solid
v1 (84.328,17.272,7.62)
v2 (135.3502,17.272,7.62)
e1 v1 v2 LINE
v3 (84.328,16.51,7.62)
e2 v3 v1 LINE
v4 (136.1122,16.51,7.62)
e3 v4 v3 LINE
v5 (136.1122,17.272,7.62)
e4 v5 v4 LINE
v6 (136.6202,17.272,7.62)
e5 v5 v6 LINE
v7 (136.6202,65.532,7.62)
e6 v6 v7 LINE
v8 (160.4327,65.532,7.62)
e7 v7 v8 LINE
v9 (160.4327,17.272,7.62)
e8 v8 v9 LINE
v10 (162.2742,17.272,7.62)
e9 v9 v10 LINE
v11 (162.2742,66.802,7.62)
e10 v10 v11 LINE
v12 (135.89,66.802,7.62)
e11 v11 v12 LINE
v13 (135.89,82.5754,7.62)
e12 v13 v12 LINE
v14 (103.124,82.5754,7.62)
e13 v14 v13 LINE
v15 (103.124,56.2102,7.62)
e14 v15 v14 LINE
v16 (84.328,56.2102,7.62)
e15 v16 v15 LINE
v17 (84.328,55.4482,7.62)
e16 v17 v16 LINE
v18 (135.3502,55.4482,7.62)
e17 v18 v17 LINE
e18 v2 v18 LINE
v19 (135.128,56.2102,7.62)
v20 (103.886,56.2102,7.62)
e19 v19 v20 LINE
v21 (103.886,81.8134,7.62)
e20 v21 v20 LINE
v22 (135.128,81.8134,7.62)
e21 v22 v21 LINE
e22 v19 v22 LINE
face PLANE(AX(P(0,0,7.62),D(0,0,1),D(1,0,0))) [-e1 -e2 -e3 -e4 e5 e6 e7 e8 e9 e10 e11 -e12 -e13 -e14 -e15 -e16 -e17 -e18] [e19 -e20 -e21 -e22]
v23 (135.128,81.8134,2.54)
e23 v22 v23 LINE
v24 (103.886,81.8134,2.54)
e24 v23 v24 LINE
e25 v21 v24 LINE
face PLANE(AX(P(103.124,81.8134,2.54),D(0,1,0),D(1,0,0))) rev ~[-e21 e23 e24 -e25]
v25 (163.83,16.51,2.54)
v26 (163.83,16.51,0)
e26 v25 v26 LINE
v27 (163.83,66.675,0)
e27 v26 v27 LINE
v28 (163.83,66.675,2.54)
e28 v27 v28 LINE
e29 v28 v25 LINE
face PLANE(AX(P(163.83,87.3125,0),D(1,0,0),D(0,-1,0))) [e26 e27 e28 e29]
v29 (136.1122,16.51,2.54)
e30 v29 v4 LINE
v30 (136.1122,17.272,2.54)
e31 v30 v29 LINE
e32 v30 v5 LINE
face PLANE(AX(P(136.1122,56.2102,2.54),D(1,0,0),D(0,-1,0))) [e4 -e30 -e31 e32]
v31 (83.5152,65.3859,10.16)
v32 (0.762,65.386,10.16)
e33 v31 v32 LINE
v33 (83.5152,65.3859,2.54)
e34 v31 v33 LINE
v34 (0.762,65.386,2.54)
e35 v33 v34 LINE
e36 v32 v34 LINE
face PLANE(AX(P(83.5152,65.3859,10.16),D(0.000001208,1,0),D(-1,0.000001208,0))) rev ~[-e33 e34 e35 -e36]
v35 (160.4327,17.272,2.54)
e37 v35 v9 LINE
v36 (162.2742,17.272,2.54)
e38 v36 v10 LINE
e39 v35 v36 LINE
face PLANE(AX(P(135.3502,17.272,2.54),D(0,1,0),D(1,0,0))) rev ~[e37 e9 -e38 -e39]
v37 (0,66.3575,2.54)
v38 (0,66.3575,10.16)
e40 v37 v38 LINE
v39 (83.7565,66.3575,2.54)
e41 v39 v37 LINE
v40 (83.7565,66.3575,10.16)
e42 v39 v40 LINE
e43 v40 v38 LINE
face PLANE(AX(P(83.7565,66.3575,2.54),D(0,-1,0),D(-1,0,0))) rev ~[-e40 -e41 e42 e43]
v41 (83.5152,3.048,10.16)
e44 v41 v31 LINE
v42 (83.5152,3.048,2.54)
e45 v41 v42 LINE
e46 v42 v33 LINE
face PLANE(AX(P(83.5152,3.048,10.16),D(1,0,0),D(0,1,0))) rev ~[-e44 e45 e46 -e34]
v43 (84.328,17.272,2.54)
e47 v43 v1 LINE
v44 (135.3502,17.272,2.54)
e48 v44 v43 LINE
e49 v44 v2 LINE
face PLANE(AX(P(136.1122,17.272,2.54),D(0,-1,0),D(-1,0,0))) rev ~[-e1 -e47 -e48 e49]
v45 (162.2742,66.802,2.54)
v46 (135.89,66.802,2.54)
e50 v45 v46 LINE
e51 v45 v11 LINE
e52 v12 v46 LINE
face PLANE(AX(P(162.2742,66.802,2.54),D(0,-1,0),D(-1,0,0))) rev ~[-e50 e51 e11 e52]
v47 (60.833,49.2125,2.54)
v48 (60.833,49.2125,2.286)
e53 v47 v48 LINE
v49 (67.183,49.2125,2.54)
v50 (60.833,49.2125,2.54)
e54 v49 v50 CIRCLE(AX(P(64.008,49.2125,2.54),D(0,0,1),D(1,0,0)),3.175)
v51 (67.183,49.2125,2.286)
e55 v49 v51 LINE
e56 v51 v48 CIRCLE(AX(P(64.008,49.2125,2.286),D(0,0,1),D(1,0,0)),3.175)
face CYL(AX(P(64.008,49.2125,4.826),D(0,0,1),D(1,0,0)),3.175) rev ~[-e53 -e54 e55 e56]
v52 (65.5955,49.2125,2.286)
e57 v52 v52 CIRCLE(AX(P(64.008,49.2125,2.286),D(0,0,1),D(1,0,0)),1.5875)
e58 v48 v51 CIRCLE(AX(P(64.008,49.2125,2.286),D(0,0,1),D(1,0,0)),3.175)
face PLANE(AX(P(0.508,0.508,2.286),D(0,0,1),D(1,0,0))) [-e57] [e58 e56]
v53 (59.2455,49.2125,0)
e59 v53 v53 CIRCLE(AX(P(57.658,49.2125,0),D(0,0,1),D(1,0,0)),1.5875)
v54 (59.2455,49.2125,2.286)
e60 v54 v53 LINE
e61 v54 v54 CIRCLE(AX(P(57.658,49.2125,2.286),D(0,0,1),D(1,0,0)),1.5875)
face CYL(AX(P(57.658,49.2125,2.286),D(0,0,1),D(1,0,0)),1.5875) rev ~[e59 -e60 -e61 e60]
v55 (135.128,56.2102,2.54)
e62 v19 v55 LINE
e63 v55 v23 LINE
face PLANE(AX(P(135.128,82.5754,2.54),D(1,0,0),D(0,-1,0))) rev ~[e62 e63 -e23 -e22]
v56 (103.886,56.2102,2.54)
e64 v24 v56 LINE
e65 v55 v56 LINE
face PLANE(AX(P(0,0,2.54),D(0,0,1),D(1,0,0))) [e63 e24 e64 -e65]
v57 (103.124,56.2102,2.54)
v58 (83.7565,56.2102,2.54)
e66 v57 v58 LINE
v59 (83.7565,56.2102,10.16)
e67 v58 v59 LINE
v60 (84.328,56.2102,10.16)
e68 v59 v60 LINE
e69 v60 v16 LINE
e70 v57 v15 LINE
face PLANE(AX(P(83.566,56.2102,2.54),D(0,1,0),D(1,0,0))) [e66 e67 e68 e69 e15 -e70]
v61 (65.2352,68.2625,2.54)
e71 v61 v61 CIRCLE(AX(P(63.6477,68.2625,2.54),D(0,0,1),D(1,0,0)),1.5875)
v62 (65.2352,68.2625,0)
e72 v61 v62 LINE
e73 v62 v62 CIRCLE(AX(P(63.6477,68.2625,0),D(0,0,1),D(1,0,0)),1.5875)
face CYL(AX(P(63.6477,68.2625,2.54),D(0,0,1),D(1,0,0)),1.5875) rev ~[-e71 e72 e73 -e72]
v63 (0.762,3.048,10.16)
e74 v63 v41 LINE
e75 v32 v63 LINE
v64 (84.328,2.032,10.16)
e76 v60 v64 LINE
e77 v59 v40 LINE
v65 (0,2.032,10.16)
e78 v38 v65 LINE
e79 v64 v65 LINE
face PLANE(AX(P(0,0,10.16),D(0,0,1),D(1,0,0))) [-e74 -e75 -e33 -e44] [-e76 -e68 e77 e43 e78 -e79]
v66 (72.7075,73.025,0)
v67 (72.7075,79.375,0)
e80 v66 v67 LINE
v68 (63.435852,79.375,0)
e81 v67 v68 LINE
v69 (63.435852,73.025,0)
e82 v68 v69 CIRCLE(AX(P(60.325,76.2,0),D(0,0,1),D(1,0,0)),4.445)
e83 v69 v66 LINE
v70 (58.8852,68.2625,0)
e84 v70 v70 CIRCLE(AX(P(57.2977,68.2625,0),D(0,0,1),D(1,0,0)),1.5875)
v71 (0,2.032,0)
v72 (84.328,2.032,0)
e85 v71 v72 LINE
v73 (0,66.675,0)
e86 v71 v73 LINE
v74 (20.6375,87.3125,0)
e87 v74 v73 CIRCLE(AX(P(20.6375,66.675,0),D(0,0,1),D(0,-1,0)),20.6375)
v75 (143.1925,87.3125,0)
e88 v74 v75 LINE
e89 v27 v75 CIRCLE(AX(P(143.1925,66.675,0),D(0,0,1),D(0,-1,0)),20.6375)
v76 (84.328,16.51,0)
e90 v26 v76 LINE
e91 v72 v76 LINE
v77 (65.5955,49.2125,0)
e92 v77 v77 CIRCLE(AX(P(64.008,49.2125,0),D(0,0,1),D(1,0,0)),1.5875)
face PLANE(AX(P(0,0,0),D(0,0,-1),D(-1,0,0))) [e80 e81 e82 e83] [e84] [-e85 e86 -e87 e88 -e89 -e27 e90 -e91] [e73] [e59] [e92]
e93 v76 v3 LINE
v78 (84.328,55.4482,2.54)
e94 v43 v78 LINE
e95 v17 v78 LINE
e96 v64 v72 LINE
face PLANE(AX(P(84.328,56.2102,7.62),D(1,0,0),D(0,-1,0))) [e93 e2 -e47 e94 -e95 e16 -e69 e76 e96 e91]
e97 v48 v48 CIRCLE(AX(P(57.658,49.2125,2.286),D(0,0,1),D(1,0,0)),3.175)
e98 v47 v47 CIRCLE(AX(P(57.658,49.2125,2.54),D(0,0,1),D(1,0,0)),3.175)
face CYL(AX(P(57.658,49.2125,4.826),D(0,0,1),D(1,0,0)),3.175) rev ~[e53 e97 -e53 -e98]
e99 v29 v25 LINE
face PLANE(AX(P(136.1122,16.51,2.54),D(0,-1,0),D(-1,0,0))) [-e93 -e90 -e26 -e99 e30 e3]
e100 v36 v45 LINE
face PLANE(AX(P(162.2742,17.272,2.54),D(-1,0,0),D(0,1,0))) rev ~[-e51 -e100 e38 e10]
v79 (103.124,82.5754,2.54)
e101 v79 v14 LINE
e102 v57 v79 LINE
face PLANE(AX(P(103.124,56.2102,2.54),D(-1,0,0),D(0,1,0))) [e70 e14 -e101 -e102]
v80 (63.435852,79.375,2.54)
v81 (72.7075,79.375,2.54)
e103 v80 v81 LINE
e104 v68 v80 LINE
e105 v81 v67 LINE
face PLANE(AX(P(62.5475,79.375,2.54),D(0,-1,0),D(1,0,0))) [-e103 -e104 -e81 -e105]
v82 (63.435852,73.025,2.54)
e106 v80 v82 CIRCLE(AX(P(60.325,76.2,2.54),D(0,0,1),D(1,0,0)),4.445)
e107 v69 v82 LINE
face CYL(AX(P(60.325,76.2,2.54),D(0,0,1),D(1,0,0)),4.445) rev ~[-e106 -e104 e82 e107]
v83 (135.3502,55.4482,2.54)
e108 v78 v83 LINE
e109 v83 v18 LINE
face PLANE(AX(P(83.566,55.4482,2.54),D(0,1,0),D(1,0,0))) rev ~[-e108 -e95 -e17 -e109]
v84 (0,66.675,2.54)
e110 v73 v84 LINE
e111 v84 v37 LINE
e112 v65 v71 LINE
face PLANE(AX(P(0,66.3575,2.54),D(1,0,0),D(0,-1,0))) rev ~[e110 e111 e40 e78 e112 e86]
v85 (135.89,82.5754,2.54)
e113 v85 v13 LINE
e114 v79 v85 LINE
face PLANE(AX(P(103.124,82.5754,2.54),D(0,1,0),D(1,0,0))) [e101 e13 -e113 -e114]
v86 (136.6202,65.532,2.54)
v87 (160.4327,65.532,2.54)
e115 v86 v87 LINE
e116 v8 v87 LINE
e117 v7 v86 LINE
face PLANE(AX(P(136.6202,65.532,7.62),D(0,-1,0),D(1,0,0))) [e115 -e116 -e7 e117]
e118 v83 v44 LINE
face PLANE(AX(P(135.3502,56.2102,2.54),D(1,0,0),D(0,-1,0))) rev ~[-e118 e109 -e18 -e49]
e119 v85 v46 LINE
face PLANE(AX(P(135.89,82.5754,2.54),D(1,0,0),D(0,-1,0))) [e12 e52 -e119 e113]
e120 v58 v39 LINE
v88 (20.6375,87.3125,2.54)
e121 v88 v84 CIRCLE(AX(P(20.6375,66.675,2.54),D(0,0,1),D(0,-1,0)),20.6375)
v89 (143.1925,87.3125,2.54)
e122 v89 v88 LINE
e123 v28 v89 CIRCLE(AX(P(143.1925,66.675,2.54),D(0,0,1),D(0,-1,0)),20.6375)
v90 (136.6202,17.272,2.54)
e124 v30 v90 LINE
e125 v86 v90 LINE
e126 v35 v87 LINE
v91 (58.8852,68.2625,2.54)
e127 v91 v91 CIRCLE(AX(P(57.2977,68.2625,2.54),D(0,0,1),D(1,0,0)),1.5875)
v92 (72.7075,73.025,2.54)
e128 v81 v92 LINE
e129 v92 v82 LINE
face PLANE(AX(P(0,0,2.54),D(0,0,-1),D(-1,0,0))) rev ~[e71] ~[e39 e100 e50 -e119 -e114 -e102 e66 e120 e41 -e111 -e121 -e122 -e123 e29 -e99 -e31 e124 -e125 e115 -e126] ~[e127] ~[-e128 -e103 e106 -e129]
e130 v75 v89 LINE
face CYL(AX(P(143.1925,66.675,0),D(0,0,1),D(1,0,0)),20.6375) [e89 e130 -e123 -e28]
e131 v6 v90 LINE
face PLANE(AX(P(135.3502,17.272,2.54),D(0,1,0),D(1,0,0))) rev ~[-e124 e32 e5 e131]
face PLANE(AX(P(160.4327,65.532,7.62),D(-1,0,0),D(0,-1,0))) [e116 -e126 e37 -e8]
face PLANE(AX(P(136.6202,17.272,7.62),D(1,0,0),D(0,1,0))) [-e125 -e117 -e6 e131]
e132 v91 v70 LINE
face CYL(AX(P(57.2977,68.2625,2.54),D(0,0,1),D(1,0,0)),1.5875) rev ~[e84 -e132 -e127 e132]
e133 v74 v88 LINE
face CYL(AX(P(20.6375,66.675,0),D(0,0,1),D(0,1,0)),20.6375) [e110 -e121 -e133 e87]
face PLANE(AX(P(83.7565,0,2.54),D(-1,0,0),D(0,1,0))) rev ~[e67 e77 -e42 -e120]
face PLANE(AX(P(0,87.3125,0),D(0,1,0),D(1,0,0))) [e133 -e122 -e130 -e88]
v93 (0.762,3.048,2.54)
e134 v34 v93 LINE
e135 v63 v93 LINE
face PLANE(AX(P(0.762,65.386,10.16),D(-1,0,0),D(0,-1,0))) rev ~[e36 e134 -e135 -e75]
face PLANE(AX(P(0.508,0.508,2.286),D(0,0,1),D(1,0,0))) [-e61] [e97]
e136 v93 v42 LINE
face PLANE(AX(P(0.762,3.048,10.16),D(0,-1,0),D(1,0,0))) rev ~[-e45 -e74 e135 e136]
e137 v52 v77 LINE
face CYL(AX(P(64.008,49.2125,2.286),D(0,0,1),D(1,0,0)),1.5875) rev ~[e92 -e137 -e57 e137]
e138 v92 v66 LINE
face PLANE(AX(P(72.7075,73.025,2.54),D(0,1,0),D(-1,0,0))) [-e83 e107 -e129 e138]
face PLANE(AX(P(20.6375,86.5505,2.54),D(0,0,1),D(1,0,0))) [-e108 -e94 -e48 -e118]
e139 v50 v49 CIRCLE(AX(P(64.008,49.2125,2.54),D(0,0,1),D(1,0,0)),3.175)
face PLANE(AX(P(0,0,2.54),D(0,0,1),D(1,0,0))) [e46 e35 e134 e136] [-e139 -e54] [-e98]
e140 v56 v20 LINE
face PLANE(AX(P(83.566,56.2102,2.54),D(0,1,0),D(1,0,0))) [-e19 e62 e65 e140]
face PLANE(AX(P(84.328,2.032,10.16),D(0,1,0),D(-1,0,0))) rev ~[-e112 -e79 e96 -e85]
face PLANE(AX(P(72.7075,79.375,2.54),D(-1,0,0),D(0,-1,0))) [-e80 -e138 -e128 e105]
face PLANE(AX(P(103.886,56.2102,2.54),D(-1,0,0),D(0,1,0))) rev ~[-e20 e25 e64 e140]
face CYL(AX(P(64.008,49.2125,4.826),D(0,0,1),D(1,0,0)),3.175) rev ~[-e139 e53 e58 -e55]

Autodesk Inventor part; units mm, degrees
sketch "Sketch1" plane through (0, 0, 0) normal (0, 0, 1) x (1, 0, 0)
  line L0 (0, 87.3125) -> (163.83, 87.3125)
  line L1 (163.83, 87.3125) -> (163.83, 0)
  line L2 (163.83, 0) -> (0, 0)
  line L3 (0, 0) -> (0, 87.3125)
  dimension "d0" = 163.83
  dimension "d1" = 87.3125
extrude "Extrusion1" add sketch "Sketch1" along normal blind 2.54
sketch "Sketch2" plane through (0, 0, 2.54) normal (0, 0, 1) x (1, 0, 0)
  point P0 (0, 0)
fillet "Fillet1" radius 20.6375 1 edges at (163.83, 87.3125, 1.27)
fillet "Fillet2" radius 20.6375 1 edges at (0, 87.3125, 1.27)
sketch "Sketch8" plane through (0, 0, 2.54) normal (0, 0, 1) x (1, 0, 0)
  point P0 (0, 0)
sketch "Sketch11" plane through (0, 0, 2.54) normal (0, 0, 1) x (1, 0, 0)
  point P0 (0, 0)
sketch "Sketch15" plane through (0, 0, 2.54) normal (0, 0, 1) x (1, 0, 0)
  line L0 (83.566, 56.2102) -> (136.1122, 56.2102)
  line L1 (136.1122, 56.2102) -> (136.1122, 16.51)
  line L2 (136.1122, 16.51) -> (83.566, 16.51)
  line L3 (83.566, 16.51) -> (83.566, 56.2102)
  line L4 (0, 0) -> (163.83, 0) projected
  line L5 (163.83, 0) -> (163.83, 66.675) projected
  dimension "d136" = 52.5463
  dimension "d137" = 16.51
  dimension "d151" = 39.7002
  dimension "d184" = 27.7177
extrude "Extrusion6" add sketch "Sketch15" along normal blind 5.08
shell "Shell5" thickness 0.762 removed faces 1 at (101.0814, 42.9768, 7.62)
sketch "Sketch16" plane through (0, 0, 2.54) normal (0, 0, 1) x (1, 0, 0)
  line L0 (103.124, 82.5754) -> (135.89, 82.5754)
  line L1 (135.89, 82.5754) -> (135.89, 56.2102)
  line L2 (135.89, 56.2102) -> (103.124, 56.2102)
  line L3 (103.124, 56.2102) -> (103.124, 82.5754)
  arc A0 (163.83, 66.675) -> (143.1925, 87.3125) centre (143.1925, 66.675) ccw projected
  line L4 (136.1122, 56.2102) -> (83.566, 56.2102) projected
  point P0 (0, 0)
  dimension "d62" = 32.766
  dimension "d63" = 26.3652
  dimension "d183" = 27.94
  dimension "d231" = 0
extrude "Extrusion7" add sketch "Sketch16" along normal blind 5.08
shell "Shell6" thickness 0.762 removed faces 1 at (124.968, 73.787, 7.62)
sketch "Sketch20" plane through (0, 0, 2.54) normal (0, 0, 1) x (1, 0, 0)
  circle A0 centre (60.325, 76.2) radius 4.445
  line L0 (0, 66.675) -> (0, 0) projected
  line L1 (103.124, 87.3125) -> (20.6375, 87.3125) projected
  point P0 (103.124, 82.5754)
  point P1 (20.6375, 87.3125)
  dimension "d77" = 8.89
  dimension "d138" = 60.325
  dimension "d150" = 11.1125
sketch "Sketch24" plane through (0, 0, 2.54) normal (0, 0, 1) x (1, 0, 0)
  line L0 (0, 0) -> (83.7565, 0)
  line L1 (83.7565, 0) -> (83.7565, 66.3575)
  line L2 (83.7565, 66.3575) -> (0, 66.3575)
  line L3 (0, 66.3575) -> (0, 0)
  line L4 (103.124, 87.3125) -> (20.6375, 87.3125) projected
  point P0 (103.124, 82.5754)
  point P1 (20.6375, 87.3125)
  dimension "d114" = 83.7565
  dimension "d210" = 20.955
extrude "Extrusion13" add sketch "Sketch24" along normal blind 7.62
sketch "Sketch25" plane through (0, 0, 2.54) normal (0, 0, 1) x (1, 0, 0)
  circle A0 centre (57.2977, 68.2625) radius 1.5875
  line L0 (0, 66.675) -> (0, 66.3575) projected
  circle A1 centre (63.6477, 68.2625) radius 1.5875
  line L1 (103.124, 87.3125) -> (20.6375, 87.3125) projected
  point P0 (0, 0)
  point P1 (103.124, 82.5754)
  point P2 (20.6375, 87.3125)
  dimension "d126" = 3.175
  dimension "d139" = 57.2977
  dimension "d141" = 6.35
  dimension "d149" = 19.05
sketch "Sketch27" plane through (0, 0, 2.54) normal (0, 0, 1) x (1, 0, 0)
  line L0 (62.5475, 79.375) -> (72.7075, 79.375)
  line L1 (72.7075, 79.375) -> (72.7075, 73.025)
  line L2 (72.7075, 73.025) -> (62.5475, 73.025)
  line L3 (62.5475, 73.025) -> (62.5475, 79.375)
  arc A0 (20.6375, 87.3125) -> (0, 66.675) centre (20.6375, 66.675) ccw projected
  point P0 (0, 0)
  dimension "d181" = 41.91
  dimension "d182" = 10.16
ref_plane "Work Plane1" through (0.508, 0.508, 2.286) normal (0, 0, 1) x (1, 0, 0)
sketch "Sketch28" plane through (0.508, 0.508, 2.286) normal (0, 0, 1) x (1, 0, 0)
  circle A0 centre (57.15, 48.7045) radius 1.5875
  circle A1 centre (56.7897, 67.7545) radius 1.5875 projected
  circle A2 centre (63.5, 48.7045) radius 1.5875
  circle A3 centre (62.992, 67.7545) radius 1.5875 projected
  point P0 (-0.508, -0.508)
  dimension "d154" = 19.05
  dimension "d155" = 3.175
  dimension "d156" = 19.05
  dimension "d157" = 6.35
ref_plane "Work Plane2" through (0.508, 0.508, 2.286) normal (0, 0, 1) x (1, 0, 0)
sketch "Sketch29" plane through (0.508, 0.508, 2.286) normal (0, 0, 1) x (1, 0, 0)
  line L0 (82.7405, 64.7065) -> (0, 64.7065) projected
  line L1 (82.7405, 0) -> (0, 0) projected
  line L2 (0, 64.7065) -> (82.7405, 64.7065)
  line L3 (82.7405, 64.7065) -> (82.7405, 0)
  line L4 (82.7405, 0) -> (0, 0)
  line L5 (0, 0) -> (0, 64.7065)
  point P0 (-0.508, -0.508)
  point P1 (84.836, 62.484)
extrude "Extrusion16" add sketch "Sketch29" along normal blind 2.54
ref_plane "Work Plane3" through (0.508, 0.508, 4.826) normal (0, 0, 1) x (1, 0, 0)
sketch "Sketch30" plane through (0.508, 0.508, 4.826) normal (0, 0, 1) x (1, 0, 0)
  circle A0 centre (57.15, 48.7045) radius 3.175
  circle A1 centre (63.5, 48.7045) radius 3.175
  circle A2 centre (56.7897, 67.7545) radius 1.5875 projected
  circle A3 centre (62.992, 67.7545) radius 1.5875 projected
  point P0 (-0.508, -0.508)
  dimension "d162" = 6.35
  dimension "d163" = 19.05
  dimension "d164" = 19.05
sketch "Sketch33" plane through (20.6375, 86.5505, 0.762) normal (0, 0, 1) x (1, 0, 0)
  line L0 (63.6905, -69.2785) -> (63.6905, -31.1023) projected
  line L1 (114.7127, -69.2785) -> (63.6905, -69.2785) projected
  line L2 (63.6905, -31.1023) -> (114.7127, -31.1023)
  line L3 (114.7127, -31.1023) -> (114.7127, -69.2785)
  line L4 (114.7127, -69.2785) -> (63.6905, -69.2785)
  line L5 (63.6905, -69.2785) -> (63.6905, -31.1023)
  point P0 (-20.6375, -86.5505)
extrude "Extrusion20" add sketch "Sketch33" along normal blind 1.778
sketch "Sketch34" plane through (0, 0, 0) normal (0, 0, -1) x (-1, 0, 0)
  line L0 (-163.83, 0) -> (0, 0)
  line L1 (0, 0) -> (0, 87.3125)
  line L2 (0, 87.3125) -> (-163.83, 87.3125)
  line L3 (-163.83, 87.3125) -> (-163.83, 0)
  point P0 (0, 0)
extrude "Extrusion21" add sketch "Sketch34" against normal blind 2.54
extrude "Extrusion22" cut sketch "Sketch20" against normal blind 7.62
extrude "Extrusion23" cut sketch "Sketch25" against normal blind 7.62
extrude "Extrusion24" cut sketch "Sketch28" along normal mid plane 7.62 contours A0 | A2
extrude "Extrusion25" cut sketch "Sketch27" against normal blind 7.62
fillet "Fillet4" radius 20.6375 1 edges at (163.83, 87.3125, 1.27)
fillet "Fillet5" radius 20.6375 1 edges at (0, 87.3125, 1.27)
sketch "Sketch35" plane through (0, 0, 2.54) normal (0, 0, 1) x (1, 0, 0)
  line L0 (135.3502, 17.272) -> (84.328, 17.272) projected
  line L1 (135.3502, 17.272) -> (162.2742, 17.272)
  line L2 (162.2742, 17.272) -> (162.2742, 66.802)
  line L3 (162.2742, 66.802) -> (135.3502, 66.802)
  line L4 (135.3502, 66.802) -> (135.3502, 17.272)
  point P0 (0, 0)
  point P1 (85.344, 22.352)
  dimension "d199" = 26.924
  dimension "d200" = 49.53
extrude "Extrusion26" add sketch "Sketch35" along normal blind 5.08
sketch "Sketch36" plane through (0, 0, 7.62) normal (0, 0, 1) x (1, 0, 0)
  line L0 (136.6202, 65.532) -> (160.4327, 65.532)
  line L1 (160.4327, 65.532) -> (160.4327, 14.732)
  line L2 (160.4327, 14.732) -> (136.6202, 14.732)
  line L3 (136.6202, 14.732) -> (136.6202, 65.532)
  line L4 (135.3502, 55.4482) -> (135.3502, 17.272) projected
  line L5 (162.2742, 66.802) -> (135.89, 66.802) projected
  line L6 (136.1122, 17.272) -> (162.2742, 17.272) projected
  point P0 (0, 0)
  point P1 (135.3502, 66.802)
  dimension "d203" = 23.8125
  dimension "d204" = 1.27
  dimension "d205" = 1.27
  dimension "d207" = 50.8
extrude "Extrusion27" cut sketch "Sketch36" against normal blind 5.08
sketch "Sketch37" plane through (0, 0, 10.16) normal (0, 0, 1) x (1, 0, 0)
  line L0 (0.762, 3.048) -> (83.5152, 3.048)
  line L1 (83.5152, 3.048) -> (83.5152, 65.3859)
  line L2 (83.5152, 65.3859) -> (0.762, 65.386)
  line L3 (0.762, 65.386) -> (0.762, 3.048)
  line L4 (0, 66.3575) -> (0, 0) projected
  line L5 (0, 0) -> (83.7565, 0) projected
  dimension "d211" = 82.7532
  dimension "d212" = 62.3379
  dimension "d213" = 0.762
  dimension "d214" = 3.048
extrude "Extrusion28" cut sketch "Sketch37" against normal blind 7.62
extrude "Extrusion29" cut sketch "Sketch30" against normal blind 2.54 contours A0 | A1
sketch "Sketch38" plane through (0, 0, 2.54) normal (0, 0, 1) x (1, 0, 0)
  line L0 (163.83, 0) -> (0, 0) projected
  line L1 (163.83, 0) -> (84.1375, 0)
  line L2 (84.1375, 0) -> (84.1375, 16.51)
  line L3 (84.1375, 16.51) -> (163.83, 16.51)
  line L4 (163.83, 16.51) -> (163.83, 0)
  dimension "d229" = 16.51
extrude "Extrusion30" cut sketch "Sketch38" against normal blind 12.7
sketch "Sketch39" plane through (0, 0, 7.62) normal (0, 0, 1) x (1, 0, 0)
  line L0 (83.7565, 66.3575) -> (83.7565, 56.2102) projected
  line L1 (83.7565, 56.2102) -> (84.328, 56.2102)
  line L2 (84.328, 56.2102) -> (84.328, 0)
  line L3 (84.328, 0) -> (83.7565, 0)
  line L4 (83.7565, 0) -> (83.7565, 56.2102)
  line L5 (84.328, 17.272) -> (84.328, 55.4482) projected
  line L6 (83.7565, 0) -> (84.1375, 0) projected
  point P0 (0, 0)
  dimension "d221" = 0
  dimension "d230" = 0
extrude "Extrusion31" add sketch "Sketch39" along normal blind 2.54 and the other way blind 7.62
sketch "Sketch40" plane through (0, 0, 10.16) normal (0, 0, 1) x (1, 0, 0)
  line L0 (84.328, 0) -> (84.328, 56.2102) projected
  line L1 (0, 0) -> (84.328, 0)
  line L2 (84.328, 0) -> (84.328, 2.032)
  line L3 (84.328, 2.032) -> (0, 2.032)
  line L4 (0, 2.032) -> (0, 0)
  line L5 (83.5152, 3.048) -> (0.762, 3.048) projected
  dimension "d226" = 1.016
extrude "Extrusion32" cut sketch "Sketch40" against normal blind 12.7
properties part number "Base Plate 2"
